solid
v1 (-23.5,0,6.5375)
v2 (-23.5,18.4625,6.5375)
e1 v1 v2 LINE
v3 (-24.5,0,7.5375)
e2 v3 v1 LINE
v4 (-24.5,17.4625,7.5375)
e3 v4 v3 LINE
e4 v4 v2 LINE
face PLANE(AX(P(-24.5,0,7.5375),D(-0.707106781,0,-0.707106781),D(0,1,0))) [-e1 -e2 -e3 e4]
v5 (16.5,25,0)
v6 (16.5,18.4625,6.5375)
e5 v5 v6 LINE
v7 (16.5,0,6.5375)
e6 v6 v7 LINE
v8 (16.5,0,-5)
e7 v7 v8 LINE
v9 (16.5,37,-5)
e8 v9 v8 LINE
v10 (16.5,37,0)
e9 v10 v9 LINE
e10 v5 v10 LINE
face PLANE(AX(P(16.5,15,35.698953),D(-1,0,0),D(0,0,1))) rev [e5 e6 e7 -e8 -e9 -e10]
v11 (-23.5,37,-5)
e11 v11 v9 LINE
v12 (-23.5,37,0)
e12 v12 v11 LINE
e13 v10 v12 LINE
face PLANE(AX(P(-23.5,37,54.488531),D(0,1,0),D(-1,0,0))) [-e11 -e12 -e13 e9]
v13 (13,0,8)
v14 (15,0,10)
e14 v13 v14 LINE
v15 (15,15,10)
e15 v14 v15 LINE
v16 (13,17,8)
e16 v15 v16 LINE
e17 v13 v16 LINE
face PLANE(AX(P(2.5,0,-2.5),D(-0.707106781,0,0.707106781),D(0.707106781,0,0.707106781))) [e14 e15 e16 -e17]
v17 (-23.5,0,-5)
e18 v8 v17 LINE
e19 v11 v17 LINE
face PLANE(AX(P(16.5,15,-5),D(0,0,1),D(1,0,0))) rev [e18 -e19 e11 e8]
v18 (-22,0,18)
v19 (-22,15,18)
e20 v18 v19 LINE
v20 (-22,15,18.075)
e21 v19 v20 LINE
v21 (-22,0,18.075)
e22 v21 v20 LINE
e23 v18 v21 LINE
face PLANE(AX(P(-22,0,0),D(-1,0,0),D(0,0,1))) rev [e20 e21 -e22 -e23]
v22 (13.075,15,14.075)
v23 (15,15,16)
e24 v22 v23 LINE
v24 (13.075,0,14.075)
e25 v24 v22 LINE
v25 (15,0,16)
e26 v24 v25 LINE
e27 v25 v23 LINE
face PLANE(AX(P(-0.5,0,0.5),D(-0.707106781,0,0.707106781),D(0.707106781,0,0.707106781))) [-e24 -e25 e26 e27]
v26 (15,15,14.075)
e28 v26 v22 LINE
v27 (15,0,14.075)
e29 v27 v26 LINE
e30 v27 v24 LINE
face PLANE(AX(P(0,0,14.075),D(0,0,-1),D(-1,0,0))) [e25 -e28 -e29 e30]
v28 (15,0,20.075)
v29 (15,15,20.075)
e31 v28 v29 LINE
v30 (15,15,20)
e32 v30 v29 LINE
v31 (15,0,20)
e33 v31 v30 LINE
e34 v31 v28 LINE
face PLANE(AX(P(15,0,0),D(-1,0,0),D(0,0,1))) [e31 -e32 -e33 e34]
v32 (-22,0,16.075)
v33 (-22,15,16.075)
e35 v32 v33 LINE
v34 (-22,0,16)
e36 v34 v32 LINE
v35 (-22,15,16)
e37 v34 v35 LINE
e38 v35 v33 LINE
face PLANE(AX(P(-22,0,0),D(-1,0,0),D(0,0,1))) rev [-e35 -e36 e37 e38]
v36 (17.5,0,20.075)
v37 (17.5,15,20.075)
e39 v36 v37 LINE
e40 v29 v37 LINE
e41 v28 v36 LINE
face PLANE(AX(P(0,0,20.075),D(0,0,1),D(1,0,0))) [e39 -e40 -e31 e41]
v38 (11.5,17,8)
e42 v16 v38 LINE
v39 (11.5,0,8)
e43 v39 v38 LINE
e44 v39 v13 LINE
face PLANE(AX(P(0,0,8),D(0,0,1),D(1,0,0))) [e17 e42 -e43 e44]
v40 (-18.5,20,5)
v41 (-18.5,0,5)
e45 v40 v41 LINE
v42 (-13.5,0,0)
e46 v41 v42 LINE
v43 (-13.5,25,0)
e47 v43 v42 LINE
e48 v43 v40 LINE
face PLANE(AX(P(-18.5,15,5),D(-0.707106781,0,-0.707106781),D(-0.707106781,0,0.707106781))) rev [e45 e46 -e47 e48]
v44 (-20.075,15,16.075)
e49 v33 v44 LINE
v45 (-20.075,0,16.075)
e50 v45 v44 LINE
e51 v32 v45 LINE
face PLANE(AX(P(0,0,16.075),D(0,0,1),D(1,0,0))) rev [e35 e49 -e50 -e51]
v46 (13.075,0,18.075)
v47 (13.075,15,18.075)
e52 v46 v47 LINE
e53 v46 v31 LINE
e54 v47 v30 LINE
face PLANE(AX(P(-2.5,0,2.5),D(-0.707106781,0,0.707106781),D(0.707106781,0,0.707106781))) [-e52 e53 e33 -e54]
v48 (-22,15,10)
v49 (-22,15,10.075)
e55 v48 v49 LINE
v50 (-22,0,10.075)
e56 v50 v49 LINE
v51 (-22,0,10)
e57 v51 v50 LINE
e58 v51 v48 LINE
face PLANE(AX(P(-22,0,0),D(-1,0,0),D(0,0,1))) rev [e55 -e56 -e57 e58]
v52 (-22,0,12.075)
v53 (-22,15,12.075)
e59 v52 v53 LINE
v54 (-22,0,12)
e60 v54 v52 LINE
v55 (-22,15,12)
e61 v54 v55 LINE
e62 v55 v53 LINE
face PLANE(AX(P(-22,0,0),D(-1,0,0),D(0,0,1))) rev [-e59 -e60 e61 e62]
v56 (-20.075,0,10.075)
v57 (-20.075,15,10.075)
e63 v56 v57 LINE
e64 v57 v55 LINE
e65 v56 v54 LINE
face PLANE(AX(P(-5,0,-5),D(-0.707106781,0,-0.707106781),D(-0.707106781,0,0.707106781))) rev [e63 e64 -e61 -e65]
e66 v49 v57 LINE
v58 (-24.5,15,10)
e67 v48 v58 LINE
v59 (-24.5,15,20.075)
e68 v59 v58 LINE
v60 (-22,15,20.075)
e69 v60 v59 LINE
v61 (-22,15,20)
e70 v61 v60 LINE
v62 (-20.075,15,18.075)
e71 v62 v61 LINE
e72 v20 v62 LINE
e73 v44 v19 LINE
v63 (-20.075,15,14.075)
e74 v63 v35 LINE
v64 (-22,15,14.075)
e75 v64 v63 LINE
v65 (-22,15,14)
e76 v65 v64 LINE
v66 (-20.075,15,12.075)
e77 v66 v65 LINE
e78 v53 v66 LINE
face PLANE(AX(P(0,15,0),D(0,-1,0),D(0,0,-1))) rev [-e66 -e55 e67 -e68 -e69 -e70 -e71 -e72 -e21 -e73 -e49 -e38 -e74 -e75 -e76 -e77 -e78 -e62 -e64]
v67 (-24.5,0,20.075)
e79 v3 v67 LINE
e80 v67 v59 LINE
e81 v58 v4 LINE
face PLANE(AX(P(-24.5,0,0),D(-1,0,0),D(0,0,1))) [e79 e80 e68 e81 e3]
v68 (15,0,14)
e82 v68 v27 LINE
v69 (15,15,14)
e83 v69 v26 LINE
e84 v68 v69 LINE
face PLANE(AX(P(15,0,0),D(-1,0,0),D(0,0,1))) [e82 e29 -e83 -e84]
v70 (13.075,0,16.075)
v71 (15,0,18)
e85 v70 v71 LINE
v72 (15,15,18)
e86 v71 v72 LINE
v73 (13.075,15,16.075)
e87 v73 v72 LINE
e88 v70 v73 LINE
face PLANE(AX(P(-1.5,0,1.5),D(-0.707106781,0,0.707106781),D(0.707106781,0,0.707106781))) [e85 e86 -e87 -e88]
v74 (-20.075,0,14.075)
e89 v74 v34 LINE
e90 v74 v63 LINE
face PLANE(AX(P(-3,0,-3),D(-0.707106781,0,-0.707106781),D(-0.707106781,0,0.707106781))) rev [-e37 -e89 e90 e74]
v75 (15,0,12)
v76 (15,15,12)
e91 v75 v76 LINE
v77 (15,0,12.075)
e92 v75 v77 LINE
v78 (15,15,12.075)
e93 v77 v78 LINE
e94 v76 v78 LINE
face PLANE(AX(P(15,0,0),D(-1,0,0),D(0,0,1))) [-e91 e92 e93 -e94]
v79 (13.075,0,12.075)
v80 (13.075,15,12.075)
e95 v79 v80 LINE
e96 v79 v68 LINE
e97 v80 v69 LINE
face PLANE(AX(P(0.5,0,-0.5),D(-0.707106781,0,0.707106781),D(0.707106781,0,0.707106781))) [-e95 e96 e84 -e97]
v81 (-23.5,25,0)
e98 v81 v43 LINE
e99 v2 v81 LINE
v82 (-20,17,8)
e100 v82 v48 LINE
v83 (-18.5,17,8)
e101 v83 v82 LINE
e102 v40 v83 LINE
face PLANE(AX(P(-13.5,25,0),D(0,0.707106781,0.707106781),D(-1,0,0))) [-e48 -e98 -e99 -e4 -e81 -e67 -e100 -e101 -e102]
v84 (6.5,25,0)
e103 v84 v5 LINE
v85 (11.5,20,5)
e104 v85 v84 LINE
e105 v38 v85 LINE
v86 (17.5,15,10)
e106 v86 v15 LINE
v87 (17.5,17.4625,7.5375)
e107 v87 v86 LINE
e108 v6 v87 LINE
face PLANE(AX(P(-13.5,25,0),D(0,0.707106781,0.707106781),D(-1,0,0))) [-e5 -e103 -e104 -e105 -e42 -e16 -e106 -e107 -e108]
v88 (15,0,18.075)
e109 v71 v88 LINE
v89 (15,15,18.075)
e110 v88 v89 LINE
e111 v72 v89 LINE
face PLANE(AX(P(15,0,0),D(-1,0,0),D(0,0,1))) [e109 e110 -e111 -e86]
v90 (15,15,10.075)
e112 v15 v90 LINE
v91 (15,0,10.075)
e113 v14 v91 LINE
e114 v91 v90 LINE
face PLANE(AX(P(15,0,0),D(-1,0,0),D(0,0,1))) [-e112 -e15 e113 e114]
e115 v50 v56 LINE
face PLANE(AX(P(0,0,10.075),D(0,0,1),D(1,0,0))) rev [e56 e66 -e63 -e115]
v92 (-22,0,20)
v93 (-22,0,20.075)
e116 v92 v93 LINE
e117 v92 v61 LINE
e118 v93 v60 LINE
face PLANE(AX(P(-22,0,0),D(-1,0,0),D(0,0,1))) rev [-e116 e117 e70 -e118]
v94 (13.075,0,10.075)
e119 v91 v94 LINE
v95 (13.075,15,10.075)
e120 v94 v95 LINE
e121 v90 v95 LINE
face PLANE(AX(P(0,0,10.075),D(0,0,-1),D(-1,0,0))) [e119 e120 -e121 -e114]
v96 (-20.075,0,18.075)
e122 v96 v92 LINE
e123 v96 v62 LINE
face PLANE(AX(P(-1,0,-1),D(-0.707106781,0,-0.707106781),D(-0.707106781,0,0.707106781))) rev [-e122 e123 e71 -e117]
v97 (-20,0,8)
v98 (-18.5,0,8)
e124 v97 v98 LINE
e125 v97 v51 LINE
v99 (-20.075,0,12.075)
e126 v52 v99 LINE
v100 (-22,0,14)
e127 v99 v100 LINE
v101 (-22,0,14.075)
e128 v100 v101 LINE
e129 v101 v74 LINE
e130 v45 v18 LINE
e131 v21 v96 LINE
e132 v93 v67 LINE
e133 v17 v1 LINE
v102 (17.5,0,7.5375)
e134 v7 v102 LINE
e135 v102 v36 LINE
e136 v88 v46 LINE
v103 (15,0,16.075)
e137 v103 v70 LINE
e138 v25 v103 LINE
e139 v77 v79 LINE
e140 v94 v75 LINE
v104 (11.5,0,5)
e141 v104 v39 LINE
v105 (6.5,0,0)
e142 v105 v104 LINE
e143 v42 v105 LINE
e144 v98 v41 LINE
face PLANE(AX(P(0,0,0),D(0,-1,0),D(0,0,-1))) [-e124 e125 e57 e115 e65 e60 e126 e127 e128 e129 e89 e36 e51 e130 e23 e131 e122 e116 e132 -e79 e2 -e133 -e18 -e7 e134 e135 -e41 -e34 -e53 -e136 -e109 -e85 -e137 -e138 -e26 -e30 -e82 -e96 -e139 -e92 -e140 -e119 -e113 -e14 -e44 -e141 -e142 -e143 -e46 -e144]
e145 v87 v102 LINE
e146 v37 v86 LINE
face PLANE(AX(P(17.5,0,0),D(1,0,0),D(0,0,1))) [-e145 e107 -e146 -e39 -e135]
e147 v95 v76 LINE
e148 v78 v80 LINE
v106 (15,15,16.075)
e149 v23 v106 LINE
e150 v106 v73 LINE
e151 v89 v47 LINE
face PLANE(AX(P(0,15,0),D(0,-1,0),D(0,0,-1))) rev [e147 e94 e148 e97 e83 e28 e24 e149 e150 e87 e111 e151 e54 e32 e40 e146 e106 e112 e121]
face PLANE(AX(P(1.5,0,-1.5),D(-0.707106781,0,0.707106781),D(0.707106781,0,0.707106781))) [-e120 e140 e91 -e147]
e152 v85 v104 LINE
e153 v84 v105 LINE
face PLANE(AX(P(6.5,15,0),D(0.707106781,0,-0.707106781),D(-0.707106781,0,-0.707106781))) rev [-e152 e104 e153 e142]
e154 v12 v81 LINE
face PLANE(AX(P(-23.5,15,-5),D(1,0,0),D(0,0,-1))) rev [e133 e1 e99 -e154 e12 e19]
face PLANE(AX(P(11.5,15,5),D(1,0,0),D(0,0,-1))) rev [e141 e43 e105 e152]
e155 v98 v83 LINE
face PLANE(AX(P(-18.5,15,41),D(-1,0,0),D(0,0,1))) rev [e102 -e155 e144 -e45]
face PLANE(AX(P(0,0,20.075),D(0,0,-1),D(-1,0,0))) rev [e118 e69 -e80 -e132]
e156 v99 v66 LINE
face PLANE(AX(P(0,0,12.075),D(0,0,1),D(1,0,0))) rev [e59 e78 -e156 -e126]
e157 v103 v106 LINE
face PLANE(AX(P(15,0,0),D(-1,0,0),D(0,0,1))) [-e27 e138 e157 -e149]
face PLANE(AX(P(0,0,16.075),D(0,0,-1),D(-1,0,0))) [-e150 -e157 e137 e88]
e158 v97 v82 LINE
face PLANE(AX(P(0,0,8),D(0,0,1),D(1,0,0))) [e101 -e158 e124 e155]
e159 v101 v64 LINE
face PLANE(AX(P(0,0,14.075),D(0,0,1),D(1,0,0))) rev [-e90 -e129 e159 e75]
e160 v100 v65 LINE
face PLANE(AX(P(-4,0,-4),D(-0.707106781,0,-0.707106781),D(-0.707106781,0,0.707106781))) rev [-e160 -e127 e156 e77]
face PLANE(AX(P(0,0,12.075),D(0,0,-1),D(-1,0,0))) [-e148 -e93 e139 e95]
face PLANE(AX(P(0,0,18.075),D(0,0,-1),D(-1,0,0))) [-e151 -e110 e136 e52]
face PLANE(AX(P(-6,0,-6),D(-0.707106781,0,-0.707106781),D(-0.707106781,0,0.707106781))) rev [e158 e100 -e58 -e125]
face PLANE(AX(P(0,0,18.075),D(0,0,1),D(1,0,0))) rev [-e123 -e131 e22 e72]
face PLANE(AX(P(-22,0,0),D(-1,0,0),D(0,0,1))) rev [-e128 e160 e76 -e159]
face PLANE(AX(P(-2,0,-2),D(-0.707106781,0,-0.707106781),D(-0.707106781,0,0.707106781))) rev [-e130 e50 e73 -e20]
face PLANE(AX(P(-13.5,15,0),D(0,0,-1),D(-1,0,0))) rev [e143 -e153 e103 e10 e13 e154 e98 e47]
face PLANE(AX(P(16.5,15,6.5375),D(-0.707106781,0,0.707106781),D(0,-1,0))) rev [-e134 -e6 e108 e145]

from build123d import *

# Parameters (mm, degrees)
BOSS_EXTRUDE1_DEPTH = 15
SKETCH3_R           = 3.05
CUT_EXTRUDE1_DEPTH  = 15
CUT_EXTRUDE3_DEPTH  = 59.485528143
SKETCH5_W           = 12.5375
SKETCH5_H           = 15
BOSS_EXTRUDE2_DEPTH = 1
CHAMFER1_SIZE       = 1
SKETCH6_W           = 40
SKETCH6_H           = 37
BOSS_EXTRUDE3_DEPTH = 5
CHAMFER2_SIZE       = 10


# Some blends are built 0.0001 mm under size
with BuildPart() as part:
    # Sketch2 → Boss-Extrude1 (new body)
    with BuildSketch(Plane(origin=(0, 0, 0), x_dir=(1, 0, 0), z_dir=(0, 1, 0))):
        Polygon((-13.5, 0), (6.5, 0), (11.5, -5), (11.5, -41), (31.917309801, -41), (31.917309801, -35.69895288), (16.5, -35.69895288), (16.5, 5), (-23.5, 5), (-23.5, -35.69895288), (-38.917309801, -35.69895288), (-38.917309801, -41), (-18.5, -41), (-18.5, -5), align=None)
    extrude(amount=BOSS_EXTRUDE1_DEPTH)

    # Sketch3 → Cut-Extrude1 (cut)
    with BuildSketch(Plane(origin=(0, 0, 35.69895288), x_dir=(-1, 0, 0), z_dir=(0, 0, -1))):
        with Locations((26.5, 9)):
            Circle(SKETCH3_R)
        with Locations((-23.5, 9)):
            Circle(SKETCH3_R)
    extrude(amount=-CUT_EXTRUDE1_DEPTH, mode=Mode.SUBTRACT)

    # Sketch4 → Cut-Extrude3 (cut, through all)
    with BuildSketch(Plane(origin=(0, 15, 0), x_dir=(1, 0, 0), z_dir=(0, 1, 0))):
        Polygon((-22, -10.075), (-20.075, -10.075), (-22, -12), (-22, -12.075), (-20.075, -12.075), (-22, -14), (-22, -14.075), (-20.075, -14.075), (-22, -16), (-22, -16.075), (-20.075, -16.075), (-22, -18), (-22, -18.075), (-20.075, -18.075), (-22, -20), (-22, -20.075), (-23.5, -20.075), (-23.5, -35.69895288), (-38.917309801, -35.69895288), (-38.917309801, -41), (-18.5, -41), (-18.5, -16.075), (-18.5, -8), (-20, -8), (-22, -10), align=None)
        Polygon((13, -8), (11.5, -8), (11.5, -41), (31.917309801, -41), (31.917309801, -35.69895288), (16.5, -35.69895288), (16.5, -20.075), (15, -20.075), (15, -20), (13.075, -18.075), (15, -18.075), (15, -18), (13.075, -16.075), (15, -16.075), (15, -16), (13.075, -14.075), (15, -14.075), (15, -14), (13.075, -12.075), (15, -12.075), (15, -12), (13.075, -10.075), (15, -10.075), (15, -10), align=None)
    extrude(amount=-CUT_EXTRUDE3_DEPTH, mode=Mode.SUBTRACT)

    # Sketch5 → Boss-Extrude2 (add)
    with BuildSketch(Plane.ZY.offset(23.5)):
        with Locations((13.80625, 7.5)):
            Rectangle(SKETCH5_W, SKETCH5_H)
    boss_extrude2 = extrude(amount=BOSS_EXTRUDE2_DEPTH)

    # Mirror1: Boss-Extrude2 across plane
    add(boss_extrude2.mirror(Plane(origin=(-3.5, 0, 0), x_dir=(0, 0, 1), z_dir=(1, 0, 0))))

    # Chamfer1
    chamfer1_edges = [part.edges().sort_by_distance(p)[0] for p in [
        (16.5, 7.5, 7.5375),
        (-23.5, 7.5, 7.5375),
    ]]
    chamfer(chamfer1_edges, length=CHAMFER1_SIZE - 0.0001)  # a hair under: the kernel refuses the full size

    # Sketch6 → Boss-Extrude3 (add)
    with BuildSketch(Plane(origin=(0, 0, -5), x_dir=(-1, 0, 0), z_dir=(0, 0, -1))):
        with Locations((3.5, 18.5)):
            Rectangle(SKETCH6_W, SKETCH6_H)
    extrude(amount=-BOSS_EXTRUDE3_DEPTH)

    # Chamfer2
    # the kernel refuses this chamfer: 10 mm, written as the material it adds along each edge
    with BuildSketch(Plane(origin=(42.21682988, 15, 0), x_dir=(0, -0.027495876610586317, 0.9996219169112968), z_dir=(-1, 0, 0))) as chamfer2_piece_1_section:
        Polygon((CHAMFER2_SIZE * 0.999621916911, CHAMFER2_SIZE * 0.0274958766106), (-CHAMFER2_SIZE * 0.0274958766106, CHAMFER2_SIZE * 0.999621916911), (0, 0), align=None)
    chamfer2_piece_1 = extrude(amount=61.433659759, mode=Mode.PRIVATE)
    chamfer2_piece_1 = split(chamfer2_piece_1, bisect_by=Plane(origin=(15.01875, 16.231233333, 10.01875), z_dir=(0.7071067811865479, 0, -0.7071067811865472)), keep=Keep.TOP, mode=Mode.PRIVATE)
    chamfer2_piece_1 = split(chamfer2_piece_1, bisect_by=Plane(origin=(17.5, 16.231233333, 7.537533333), z_dir=(-1, 0, 0)), keep=Keep.TOP, mode=Mode.PRIVATE)
    chamfer2_piece_1 = split(chamfer2_piece_1, bisect_by=Plane(origin=(17.499966667, 16.231233333, 7.5375), z_dir=(0, 0, 1)), keep=Keep.TOP, mode=Mode.PRIVATE)
    with BuildSketch(Plane(origin=(16.5, 15, 0), x_dir=(0, -0.027495876610586317, 0.9996219169112968), z_dir=(-1, 0, 0))) as chamfer2_piece_2_section:
        Polygon((CHAMFER2_SIZE * 0.999621916911, CHAMFER2_SIZE * 0.0274958766106), (-CHAMFER2_SIZE * 0.0274958766106, CHAMFER2_SIZE * 0.999621916911), (0, 0), align=None)
    chamfer2_piece_2 = extrude(amount=35.71682988, mode=Mode.PRIVATE)
    chamfer2_piece_2 = split(chamfer2_piece_2, bisect_by=Plane(origin=(15.769248019, 18.74844553, 8), z_dir=(0, 0, -1)), keep=Keep.TOP, mode=Mode.PRIVATE)
    chamfer2_piece_2 = split(chamfer2_piece_2, bisect_by=Plane(origin=(11.5, 18.74844553, 2.503108939), z_dir=(1, 0, 0)), keep=Keep.TOP, mode=Mode.PRIVATE)
    with BuildSketch(Plane(origin=(42.21682988, 15, 0), x_dir=(0, -0.027495876610586317, 0.9996219169112968), z_dir=(-1, 0, 0))) as chamfer2_piece_3_section:
        Polygon((CHAMFER2_SIZE * 0.999621916911, CHAMFER2_SIZE * 0.0274958766106), (-CHAMFER2_SIZE * 0.0274958766106, CHAMFER2_SIZE * 0.999621916911), (0, 0), align=None)
    chamfer2_piece_3 = extrude(amount=61.433659759, mode=Mode.PRIVATE)
    chamfer2_piece_3 = split(chamfer2_piece_3, bisect_by=Plane(origin=(16.985049673, 16.407833551, 7.022649673), z_dir=(-0.7071067811865476, 0, 0.7071067811865476)), keep=Keep.TOP, mode=Mode.PRIVATE)
    chamfer2_piece_3 = split(chamfer2_piece_3, bisect_by=Plane(origin=(15.253849673, 16.407833551, 8.753849673), z_dir=(0.7071067811865476, 0, -0.7071067811865476)), keep=Keep.TOP, mode=Mode.PRIVATE)
    chamfer2_piece_3 = split(chamfer2_piece_3, bisect_by=Plane(origin=(17.5, 16.407833551, 7.184332898), z_dir=(-1, 0, 0)), keep=Keep.TOP, mode=Mode.PRIVATE)
    with BuildSketch(Plane(origin=(42.21682988, 15, 0), x_dir=(0, -0.027495876610586317, 0.9996219169112968), z_dir=(-1, 0, 0))) as chamfer2_piece_4_section:
        Polygon((CHAMFER2_SIZE * 0.999621916911, CHAMFER2_SIZE * 0.0274958766106), (-CHAMFER2_SIZE * 0.0274958766106, CHAMFER2_SIZE * 0.999621916911), (0, 0), align=None)
    chamfer2_piece_4 = extrude(amount=61.433659759, mode=Mode.PRIVATE)
    chamfer2_piece_4 = split(chamfer2_piece_4, bisect_by=Plane(origin=(8.989616943, 19.750655371, 2.489616943), z_dir=(0.7071067811865476, 0, -0.7071067811865476)), keep=Keep.TOP, mode=Mode.PRIVATE)
    chamfer2_piece_4 = split(chamfer2_piece_4, bisect_by=Plane(origin=(15, 19.750655371, 0.498689257), z_dir=(-1, 0, 0)), keep=Keep.TOP, mode=Mode.PRIVATE)
    with BuildSketch(Plane(origin=(42.21682988, 15, 0), x_dir=(0, -0.027495876610586317, 0.9996219169112968), z_dir=(-1, 0, 0))) as chamfer2_piece_5_section:
        Polygon((CHAMFER2_SIZE * 0.999621916911, CHAMFER2_SIZE * 0.0274958766106), (-CHAMFER2_SIZE * 0.0274958766106, CHAMFER2_SIZE * 0.999621916911), (0, 0), align=None)
    chamfer2_piece_5 = extrude(amount=61.433659759, mode=Mode.PRIVATE)
    chamfer2_piece_5 = split(chamfer2_piece_5, bisect_by=Plane(origin=(-18.5, 16.119619514, 7.760760971), z_dir=(-1, 0, 0)), keep=Keep.TOP, mode=Mode.PRIVATE)
    chamfer2_piece_5 = split(chamfer2_piece_5, bisect_by=Plane(origin=(-18.85841494, 16.119619514, 8), z_dir=(0, 0, -1)), keep=Keep.TOP, mode=Mode.PRIVATE)
    with BuildSketch(Plane(origin=(42.21682988, 15, 0), x_dir=(0, -0.027495876610586317, 0.9996219169112968), z_dir=(-1, 0, 0))) as chamfer2_piece_6_section:
        Polygon((CHAMFER2_SIZE * 0.999621916911, CHAMFER2_SIZE * 0.0274958766106), (-CHAMFER2_SIZE * 0.0274958766106, CHAMFER2_SIZE * 0.999621916911), (0, 0), align=None)
    chamfer2_piece_6 = extrude(amount=61.433659759, mode=Mode.PRIVATE)
    chamfer2_piece_6 = split(chamfer2_piece_6, bisect_by=Plane(origin=(-15.875, 19.25, 2.375), z_dir=(-0.7071067811865475, 0, -0.7071067811865477)), keep=Keep.TOP, mode=Mode.PRIVATE)
    with BuildSketch(Plane(origin=(12.21682988, 15, 0), x_dir=(0, -0.027495876610586317, 0.9996219169112968), z_dir=(-1, 0, 0))) as chamfer2_piece_7_section:
        Polygon((CHAMFER2_SIZE * 0.999621916911, CHAMFER2_SIZE * 0.0274958766106), (-CHAMFER2_SIZE * 0.0274958766106, CHAMFER2_SIZE * 0.999621916911), (0, 0), align=None)
    chamfer2_piece_7 = extrude(amount=61.433659759, mode=Mode.PRIVATE)
    chamfer2_piece_7 = split(chamfer2_piece_7, bisect_by=Plane(origin=(11.85841494, 16.119619514, 8), z_dir=(0, 0, -1)), keep=Keep.TOP, mode=Mode.PRIVATE)
    chamfer2_piece_7 = split(chamfer2_piece_7, bisect_by=Plane(origin=(11.5, 16.119619514, 7.760760971), z_dir=(1, 0, 0)), keep=Keep.TOP, mode=Mode.PRIVATE)
    with BuildSketch(Plane(origin=(12.21682988, 15, 0), x_dir=(0, -0.027495876610586317, 0.9996219169112968), z_dir=(-1, 0, 0))) as chamfer2_piece_8_section:
        Polygon((CHAMFER2_SIZE * 0.999621916911, CHAMFER2_SIZE * 0.0274958766106), (-CHAMFER2_SIZE * 0.0274958766106, CHAMFER2_SIZE * 0.999621916911), (0, 0), align=None)
    chamfer2_piece_8 = extrude(amount=35.71682988, mode=Mode.PRIVATE)
    chamfer2_piece_8 = split(chamfer2_piece_8, bisect_by=Plane(origin=(-18.5, 16.112575477, 7.774849047), z_dir=(-1, 0, 0)), keep=Keep.TOP, mode=Mode.PRIVATE)
    chamfer2_piece_8 = split(chamfer2_piece_8, bisect_by=Plane(origin=(-19.137424523, 16.112575477, 8), z_dir=(0, 0, -1)), keep=Keep.TOP, mode=Mode.PRIVATE)
    with BuildSketch(Plane(origin=(12.21682988, 15, 0), x_dir=(0, -0.027495876610586317, 0.9996219169112968), z_dir=(-1, 0, 0))) as chamfer2_piece_9_section:
        Polygon((CHAMFER2_SIZE * 0.999621916911, CHAMFER2_SIZE * 0.0274958766106), (-CHAMFER2_SIZE * 0.0274958766106, CHAMFER2_SIZE * 0.999621916911), (0, 0), align=None)
    chamfer2_piece_9 = extrude(amount=61.433659759, mode=Mode.PRIVATE)
    chamfer2_piece_9 = split(chamfer2_piece_9, bisect_by=Plane(origin=(-18.5, 15.733974359, 8.532051282), z_dir=(-1, 0, 0)), keep=Keep.TOP, mode=Mode.PRIVATE)
    chamfer2_piece_9 = split(chamfer2_piece_9, bisect_by=Plane(origin=(-20.863782051, 15.733974359, 8.863782051), z_dir=(-0.7071067811865476, 0, -0.7071067811865476)), keep=Keep.TOP, mode=Mode.PRIVATE)
    chamfer2_piece_9 = split(chamfer2_piece_9, bisect_by=Plane(origin=(-24.5, 15.733974359, 8.532051282), z_dir=(1, 0, 0)), keep=Keep.TOP, mode=Mode.PRIVATE)
    chamfer2_piece_9 = split(chamfer2_piece_9, bisect_by=Plane(origin=(-23.344982051, 15.733974359, 6.382582051), z_dir=(0.7071067811865476, 0, 0.7071067811865476)), keep=Keep.TOP, mode=Mode.PRIVATE)
    with BuildSketch(Plane(origin=(12.21682988, 15, 0), x_dir=(0, -0.027495876610586317, 0.9996219169112968), z_dir=(-1, 0, 0))) as chamfer2_piece_10_section:
        Polygon((CHAMFER2_SIZE * 0.999621916911, CHAMFER2_SIZE * 0.0274958766106), (-CHAMFER2_SIZE * 0.0274958766106, CHAMFER2_SIZE * 0.999621916911), (0, 0), align=None)
    chamfer2_piece_10 = extrude(amount=61.433659759, mode=Mode.PRIVATE)
    chamfer2_piece_10 = split(chamfer2_piece_10, bisect_by=Plane(origin=(8.875, 19.25, 2.375), z_dir=(0.7071067811865476, 0, -0.7071067811865476)), keep=Keep.TOP, mode=Mode.PRIVATE)
    with BuildSketch(Plane(origin=(12.21682988, 15, 0), x_dir=(0, -0.027495876610586317, 0.9996219169112968), z_dir=(-1, 0, 0))) as chamfer2_piece_11_section:
        Polygon((CHAMFER2_SIZE * 0.999621916911, CHAMFER2_SIZE * 0.0274958766106), (-CHAMFER2_SIZE * 0.0274958766106, CHAMFER2_SIZE * 0.999621916911), (0, 0), align=None)
    chamfer2_piece_11 = extrude(amount=35.71682988, mode=Mode.PRIVATE)
    chamfer2_piece_11 = split(chamfer2_piece_11, bisect_by=Plane(origin=(-15.86117072, 19.18959267, 2.36117072), z_dir=(-0.7071067811865475, 0, -0.7071067811865477)), keep=Keep.TOP, mode=Mode.PRIVATE)
    with BuildSketch(Plane(origin=(12.21682988, 15, 0), x_dir=(0, -0.027495876610586317, 0.9996219169112968), z_dir=(-1, 0, 0))) as chamfer2_piece_12_section:
        Polygon((CHAMFER2_SIZE * 0.999621916911, CHAMFER2_SIZE * 0.0274958766106), (-CHAMFER2_SIZE * 0.0274958766106, CHAMFER2_SIZE * 0.999621916911), (0, 0), align=None)
    chamfer2_piece_12 = extrude(amount=61.433659759, mode=Mode.PRIVATE)
    chamfer2_piece_12 = split(chamfer2_piece_12, bisect_by=Plane(origin=(-24.5, 16.231233333, 7.537533333), z_dir=(1, 0, 0)), keep=Keep.TOP, mode=Mode.PRIVATE)
    chamfer2_piece_12 = split(chamfer2_piece_12, bisect_by=Plane(origin=(-24.499966667, 16.231233333, 7.5375), z_dir=(0, 0, 1)), keep=Keep.TOP, mode=Mode.PRIVATE)
    chamfer2_piece_12 = split(chamfer2_piece_12, bisect_by=Plane(origin=(-23.5, 16.231233333, 7.537533333), z_dir=(-1, 0, 0)), keep=Keep.TOP, mode=Mode.PRIVATE)
    add([chamfer2_piece_1, chamfer2_piece_2, chamfer2_piece_3, chamfer2_piece_4, chamfer2_piece_5, chamfer2_piece_6, chamfer2_piece_7, chamfer2_piece_8, chamfer2_piece_9, chamfer2_piece_10, chamfer2_piece_11, chamfer2_piece_12])


solid = part.part
